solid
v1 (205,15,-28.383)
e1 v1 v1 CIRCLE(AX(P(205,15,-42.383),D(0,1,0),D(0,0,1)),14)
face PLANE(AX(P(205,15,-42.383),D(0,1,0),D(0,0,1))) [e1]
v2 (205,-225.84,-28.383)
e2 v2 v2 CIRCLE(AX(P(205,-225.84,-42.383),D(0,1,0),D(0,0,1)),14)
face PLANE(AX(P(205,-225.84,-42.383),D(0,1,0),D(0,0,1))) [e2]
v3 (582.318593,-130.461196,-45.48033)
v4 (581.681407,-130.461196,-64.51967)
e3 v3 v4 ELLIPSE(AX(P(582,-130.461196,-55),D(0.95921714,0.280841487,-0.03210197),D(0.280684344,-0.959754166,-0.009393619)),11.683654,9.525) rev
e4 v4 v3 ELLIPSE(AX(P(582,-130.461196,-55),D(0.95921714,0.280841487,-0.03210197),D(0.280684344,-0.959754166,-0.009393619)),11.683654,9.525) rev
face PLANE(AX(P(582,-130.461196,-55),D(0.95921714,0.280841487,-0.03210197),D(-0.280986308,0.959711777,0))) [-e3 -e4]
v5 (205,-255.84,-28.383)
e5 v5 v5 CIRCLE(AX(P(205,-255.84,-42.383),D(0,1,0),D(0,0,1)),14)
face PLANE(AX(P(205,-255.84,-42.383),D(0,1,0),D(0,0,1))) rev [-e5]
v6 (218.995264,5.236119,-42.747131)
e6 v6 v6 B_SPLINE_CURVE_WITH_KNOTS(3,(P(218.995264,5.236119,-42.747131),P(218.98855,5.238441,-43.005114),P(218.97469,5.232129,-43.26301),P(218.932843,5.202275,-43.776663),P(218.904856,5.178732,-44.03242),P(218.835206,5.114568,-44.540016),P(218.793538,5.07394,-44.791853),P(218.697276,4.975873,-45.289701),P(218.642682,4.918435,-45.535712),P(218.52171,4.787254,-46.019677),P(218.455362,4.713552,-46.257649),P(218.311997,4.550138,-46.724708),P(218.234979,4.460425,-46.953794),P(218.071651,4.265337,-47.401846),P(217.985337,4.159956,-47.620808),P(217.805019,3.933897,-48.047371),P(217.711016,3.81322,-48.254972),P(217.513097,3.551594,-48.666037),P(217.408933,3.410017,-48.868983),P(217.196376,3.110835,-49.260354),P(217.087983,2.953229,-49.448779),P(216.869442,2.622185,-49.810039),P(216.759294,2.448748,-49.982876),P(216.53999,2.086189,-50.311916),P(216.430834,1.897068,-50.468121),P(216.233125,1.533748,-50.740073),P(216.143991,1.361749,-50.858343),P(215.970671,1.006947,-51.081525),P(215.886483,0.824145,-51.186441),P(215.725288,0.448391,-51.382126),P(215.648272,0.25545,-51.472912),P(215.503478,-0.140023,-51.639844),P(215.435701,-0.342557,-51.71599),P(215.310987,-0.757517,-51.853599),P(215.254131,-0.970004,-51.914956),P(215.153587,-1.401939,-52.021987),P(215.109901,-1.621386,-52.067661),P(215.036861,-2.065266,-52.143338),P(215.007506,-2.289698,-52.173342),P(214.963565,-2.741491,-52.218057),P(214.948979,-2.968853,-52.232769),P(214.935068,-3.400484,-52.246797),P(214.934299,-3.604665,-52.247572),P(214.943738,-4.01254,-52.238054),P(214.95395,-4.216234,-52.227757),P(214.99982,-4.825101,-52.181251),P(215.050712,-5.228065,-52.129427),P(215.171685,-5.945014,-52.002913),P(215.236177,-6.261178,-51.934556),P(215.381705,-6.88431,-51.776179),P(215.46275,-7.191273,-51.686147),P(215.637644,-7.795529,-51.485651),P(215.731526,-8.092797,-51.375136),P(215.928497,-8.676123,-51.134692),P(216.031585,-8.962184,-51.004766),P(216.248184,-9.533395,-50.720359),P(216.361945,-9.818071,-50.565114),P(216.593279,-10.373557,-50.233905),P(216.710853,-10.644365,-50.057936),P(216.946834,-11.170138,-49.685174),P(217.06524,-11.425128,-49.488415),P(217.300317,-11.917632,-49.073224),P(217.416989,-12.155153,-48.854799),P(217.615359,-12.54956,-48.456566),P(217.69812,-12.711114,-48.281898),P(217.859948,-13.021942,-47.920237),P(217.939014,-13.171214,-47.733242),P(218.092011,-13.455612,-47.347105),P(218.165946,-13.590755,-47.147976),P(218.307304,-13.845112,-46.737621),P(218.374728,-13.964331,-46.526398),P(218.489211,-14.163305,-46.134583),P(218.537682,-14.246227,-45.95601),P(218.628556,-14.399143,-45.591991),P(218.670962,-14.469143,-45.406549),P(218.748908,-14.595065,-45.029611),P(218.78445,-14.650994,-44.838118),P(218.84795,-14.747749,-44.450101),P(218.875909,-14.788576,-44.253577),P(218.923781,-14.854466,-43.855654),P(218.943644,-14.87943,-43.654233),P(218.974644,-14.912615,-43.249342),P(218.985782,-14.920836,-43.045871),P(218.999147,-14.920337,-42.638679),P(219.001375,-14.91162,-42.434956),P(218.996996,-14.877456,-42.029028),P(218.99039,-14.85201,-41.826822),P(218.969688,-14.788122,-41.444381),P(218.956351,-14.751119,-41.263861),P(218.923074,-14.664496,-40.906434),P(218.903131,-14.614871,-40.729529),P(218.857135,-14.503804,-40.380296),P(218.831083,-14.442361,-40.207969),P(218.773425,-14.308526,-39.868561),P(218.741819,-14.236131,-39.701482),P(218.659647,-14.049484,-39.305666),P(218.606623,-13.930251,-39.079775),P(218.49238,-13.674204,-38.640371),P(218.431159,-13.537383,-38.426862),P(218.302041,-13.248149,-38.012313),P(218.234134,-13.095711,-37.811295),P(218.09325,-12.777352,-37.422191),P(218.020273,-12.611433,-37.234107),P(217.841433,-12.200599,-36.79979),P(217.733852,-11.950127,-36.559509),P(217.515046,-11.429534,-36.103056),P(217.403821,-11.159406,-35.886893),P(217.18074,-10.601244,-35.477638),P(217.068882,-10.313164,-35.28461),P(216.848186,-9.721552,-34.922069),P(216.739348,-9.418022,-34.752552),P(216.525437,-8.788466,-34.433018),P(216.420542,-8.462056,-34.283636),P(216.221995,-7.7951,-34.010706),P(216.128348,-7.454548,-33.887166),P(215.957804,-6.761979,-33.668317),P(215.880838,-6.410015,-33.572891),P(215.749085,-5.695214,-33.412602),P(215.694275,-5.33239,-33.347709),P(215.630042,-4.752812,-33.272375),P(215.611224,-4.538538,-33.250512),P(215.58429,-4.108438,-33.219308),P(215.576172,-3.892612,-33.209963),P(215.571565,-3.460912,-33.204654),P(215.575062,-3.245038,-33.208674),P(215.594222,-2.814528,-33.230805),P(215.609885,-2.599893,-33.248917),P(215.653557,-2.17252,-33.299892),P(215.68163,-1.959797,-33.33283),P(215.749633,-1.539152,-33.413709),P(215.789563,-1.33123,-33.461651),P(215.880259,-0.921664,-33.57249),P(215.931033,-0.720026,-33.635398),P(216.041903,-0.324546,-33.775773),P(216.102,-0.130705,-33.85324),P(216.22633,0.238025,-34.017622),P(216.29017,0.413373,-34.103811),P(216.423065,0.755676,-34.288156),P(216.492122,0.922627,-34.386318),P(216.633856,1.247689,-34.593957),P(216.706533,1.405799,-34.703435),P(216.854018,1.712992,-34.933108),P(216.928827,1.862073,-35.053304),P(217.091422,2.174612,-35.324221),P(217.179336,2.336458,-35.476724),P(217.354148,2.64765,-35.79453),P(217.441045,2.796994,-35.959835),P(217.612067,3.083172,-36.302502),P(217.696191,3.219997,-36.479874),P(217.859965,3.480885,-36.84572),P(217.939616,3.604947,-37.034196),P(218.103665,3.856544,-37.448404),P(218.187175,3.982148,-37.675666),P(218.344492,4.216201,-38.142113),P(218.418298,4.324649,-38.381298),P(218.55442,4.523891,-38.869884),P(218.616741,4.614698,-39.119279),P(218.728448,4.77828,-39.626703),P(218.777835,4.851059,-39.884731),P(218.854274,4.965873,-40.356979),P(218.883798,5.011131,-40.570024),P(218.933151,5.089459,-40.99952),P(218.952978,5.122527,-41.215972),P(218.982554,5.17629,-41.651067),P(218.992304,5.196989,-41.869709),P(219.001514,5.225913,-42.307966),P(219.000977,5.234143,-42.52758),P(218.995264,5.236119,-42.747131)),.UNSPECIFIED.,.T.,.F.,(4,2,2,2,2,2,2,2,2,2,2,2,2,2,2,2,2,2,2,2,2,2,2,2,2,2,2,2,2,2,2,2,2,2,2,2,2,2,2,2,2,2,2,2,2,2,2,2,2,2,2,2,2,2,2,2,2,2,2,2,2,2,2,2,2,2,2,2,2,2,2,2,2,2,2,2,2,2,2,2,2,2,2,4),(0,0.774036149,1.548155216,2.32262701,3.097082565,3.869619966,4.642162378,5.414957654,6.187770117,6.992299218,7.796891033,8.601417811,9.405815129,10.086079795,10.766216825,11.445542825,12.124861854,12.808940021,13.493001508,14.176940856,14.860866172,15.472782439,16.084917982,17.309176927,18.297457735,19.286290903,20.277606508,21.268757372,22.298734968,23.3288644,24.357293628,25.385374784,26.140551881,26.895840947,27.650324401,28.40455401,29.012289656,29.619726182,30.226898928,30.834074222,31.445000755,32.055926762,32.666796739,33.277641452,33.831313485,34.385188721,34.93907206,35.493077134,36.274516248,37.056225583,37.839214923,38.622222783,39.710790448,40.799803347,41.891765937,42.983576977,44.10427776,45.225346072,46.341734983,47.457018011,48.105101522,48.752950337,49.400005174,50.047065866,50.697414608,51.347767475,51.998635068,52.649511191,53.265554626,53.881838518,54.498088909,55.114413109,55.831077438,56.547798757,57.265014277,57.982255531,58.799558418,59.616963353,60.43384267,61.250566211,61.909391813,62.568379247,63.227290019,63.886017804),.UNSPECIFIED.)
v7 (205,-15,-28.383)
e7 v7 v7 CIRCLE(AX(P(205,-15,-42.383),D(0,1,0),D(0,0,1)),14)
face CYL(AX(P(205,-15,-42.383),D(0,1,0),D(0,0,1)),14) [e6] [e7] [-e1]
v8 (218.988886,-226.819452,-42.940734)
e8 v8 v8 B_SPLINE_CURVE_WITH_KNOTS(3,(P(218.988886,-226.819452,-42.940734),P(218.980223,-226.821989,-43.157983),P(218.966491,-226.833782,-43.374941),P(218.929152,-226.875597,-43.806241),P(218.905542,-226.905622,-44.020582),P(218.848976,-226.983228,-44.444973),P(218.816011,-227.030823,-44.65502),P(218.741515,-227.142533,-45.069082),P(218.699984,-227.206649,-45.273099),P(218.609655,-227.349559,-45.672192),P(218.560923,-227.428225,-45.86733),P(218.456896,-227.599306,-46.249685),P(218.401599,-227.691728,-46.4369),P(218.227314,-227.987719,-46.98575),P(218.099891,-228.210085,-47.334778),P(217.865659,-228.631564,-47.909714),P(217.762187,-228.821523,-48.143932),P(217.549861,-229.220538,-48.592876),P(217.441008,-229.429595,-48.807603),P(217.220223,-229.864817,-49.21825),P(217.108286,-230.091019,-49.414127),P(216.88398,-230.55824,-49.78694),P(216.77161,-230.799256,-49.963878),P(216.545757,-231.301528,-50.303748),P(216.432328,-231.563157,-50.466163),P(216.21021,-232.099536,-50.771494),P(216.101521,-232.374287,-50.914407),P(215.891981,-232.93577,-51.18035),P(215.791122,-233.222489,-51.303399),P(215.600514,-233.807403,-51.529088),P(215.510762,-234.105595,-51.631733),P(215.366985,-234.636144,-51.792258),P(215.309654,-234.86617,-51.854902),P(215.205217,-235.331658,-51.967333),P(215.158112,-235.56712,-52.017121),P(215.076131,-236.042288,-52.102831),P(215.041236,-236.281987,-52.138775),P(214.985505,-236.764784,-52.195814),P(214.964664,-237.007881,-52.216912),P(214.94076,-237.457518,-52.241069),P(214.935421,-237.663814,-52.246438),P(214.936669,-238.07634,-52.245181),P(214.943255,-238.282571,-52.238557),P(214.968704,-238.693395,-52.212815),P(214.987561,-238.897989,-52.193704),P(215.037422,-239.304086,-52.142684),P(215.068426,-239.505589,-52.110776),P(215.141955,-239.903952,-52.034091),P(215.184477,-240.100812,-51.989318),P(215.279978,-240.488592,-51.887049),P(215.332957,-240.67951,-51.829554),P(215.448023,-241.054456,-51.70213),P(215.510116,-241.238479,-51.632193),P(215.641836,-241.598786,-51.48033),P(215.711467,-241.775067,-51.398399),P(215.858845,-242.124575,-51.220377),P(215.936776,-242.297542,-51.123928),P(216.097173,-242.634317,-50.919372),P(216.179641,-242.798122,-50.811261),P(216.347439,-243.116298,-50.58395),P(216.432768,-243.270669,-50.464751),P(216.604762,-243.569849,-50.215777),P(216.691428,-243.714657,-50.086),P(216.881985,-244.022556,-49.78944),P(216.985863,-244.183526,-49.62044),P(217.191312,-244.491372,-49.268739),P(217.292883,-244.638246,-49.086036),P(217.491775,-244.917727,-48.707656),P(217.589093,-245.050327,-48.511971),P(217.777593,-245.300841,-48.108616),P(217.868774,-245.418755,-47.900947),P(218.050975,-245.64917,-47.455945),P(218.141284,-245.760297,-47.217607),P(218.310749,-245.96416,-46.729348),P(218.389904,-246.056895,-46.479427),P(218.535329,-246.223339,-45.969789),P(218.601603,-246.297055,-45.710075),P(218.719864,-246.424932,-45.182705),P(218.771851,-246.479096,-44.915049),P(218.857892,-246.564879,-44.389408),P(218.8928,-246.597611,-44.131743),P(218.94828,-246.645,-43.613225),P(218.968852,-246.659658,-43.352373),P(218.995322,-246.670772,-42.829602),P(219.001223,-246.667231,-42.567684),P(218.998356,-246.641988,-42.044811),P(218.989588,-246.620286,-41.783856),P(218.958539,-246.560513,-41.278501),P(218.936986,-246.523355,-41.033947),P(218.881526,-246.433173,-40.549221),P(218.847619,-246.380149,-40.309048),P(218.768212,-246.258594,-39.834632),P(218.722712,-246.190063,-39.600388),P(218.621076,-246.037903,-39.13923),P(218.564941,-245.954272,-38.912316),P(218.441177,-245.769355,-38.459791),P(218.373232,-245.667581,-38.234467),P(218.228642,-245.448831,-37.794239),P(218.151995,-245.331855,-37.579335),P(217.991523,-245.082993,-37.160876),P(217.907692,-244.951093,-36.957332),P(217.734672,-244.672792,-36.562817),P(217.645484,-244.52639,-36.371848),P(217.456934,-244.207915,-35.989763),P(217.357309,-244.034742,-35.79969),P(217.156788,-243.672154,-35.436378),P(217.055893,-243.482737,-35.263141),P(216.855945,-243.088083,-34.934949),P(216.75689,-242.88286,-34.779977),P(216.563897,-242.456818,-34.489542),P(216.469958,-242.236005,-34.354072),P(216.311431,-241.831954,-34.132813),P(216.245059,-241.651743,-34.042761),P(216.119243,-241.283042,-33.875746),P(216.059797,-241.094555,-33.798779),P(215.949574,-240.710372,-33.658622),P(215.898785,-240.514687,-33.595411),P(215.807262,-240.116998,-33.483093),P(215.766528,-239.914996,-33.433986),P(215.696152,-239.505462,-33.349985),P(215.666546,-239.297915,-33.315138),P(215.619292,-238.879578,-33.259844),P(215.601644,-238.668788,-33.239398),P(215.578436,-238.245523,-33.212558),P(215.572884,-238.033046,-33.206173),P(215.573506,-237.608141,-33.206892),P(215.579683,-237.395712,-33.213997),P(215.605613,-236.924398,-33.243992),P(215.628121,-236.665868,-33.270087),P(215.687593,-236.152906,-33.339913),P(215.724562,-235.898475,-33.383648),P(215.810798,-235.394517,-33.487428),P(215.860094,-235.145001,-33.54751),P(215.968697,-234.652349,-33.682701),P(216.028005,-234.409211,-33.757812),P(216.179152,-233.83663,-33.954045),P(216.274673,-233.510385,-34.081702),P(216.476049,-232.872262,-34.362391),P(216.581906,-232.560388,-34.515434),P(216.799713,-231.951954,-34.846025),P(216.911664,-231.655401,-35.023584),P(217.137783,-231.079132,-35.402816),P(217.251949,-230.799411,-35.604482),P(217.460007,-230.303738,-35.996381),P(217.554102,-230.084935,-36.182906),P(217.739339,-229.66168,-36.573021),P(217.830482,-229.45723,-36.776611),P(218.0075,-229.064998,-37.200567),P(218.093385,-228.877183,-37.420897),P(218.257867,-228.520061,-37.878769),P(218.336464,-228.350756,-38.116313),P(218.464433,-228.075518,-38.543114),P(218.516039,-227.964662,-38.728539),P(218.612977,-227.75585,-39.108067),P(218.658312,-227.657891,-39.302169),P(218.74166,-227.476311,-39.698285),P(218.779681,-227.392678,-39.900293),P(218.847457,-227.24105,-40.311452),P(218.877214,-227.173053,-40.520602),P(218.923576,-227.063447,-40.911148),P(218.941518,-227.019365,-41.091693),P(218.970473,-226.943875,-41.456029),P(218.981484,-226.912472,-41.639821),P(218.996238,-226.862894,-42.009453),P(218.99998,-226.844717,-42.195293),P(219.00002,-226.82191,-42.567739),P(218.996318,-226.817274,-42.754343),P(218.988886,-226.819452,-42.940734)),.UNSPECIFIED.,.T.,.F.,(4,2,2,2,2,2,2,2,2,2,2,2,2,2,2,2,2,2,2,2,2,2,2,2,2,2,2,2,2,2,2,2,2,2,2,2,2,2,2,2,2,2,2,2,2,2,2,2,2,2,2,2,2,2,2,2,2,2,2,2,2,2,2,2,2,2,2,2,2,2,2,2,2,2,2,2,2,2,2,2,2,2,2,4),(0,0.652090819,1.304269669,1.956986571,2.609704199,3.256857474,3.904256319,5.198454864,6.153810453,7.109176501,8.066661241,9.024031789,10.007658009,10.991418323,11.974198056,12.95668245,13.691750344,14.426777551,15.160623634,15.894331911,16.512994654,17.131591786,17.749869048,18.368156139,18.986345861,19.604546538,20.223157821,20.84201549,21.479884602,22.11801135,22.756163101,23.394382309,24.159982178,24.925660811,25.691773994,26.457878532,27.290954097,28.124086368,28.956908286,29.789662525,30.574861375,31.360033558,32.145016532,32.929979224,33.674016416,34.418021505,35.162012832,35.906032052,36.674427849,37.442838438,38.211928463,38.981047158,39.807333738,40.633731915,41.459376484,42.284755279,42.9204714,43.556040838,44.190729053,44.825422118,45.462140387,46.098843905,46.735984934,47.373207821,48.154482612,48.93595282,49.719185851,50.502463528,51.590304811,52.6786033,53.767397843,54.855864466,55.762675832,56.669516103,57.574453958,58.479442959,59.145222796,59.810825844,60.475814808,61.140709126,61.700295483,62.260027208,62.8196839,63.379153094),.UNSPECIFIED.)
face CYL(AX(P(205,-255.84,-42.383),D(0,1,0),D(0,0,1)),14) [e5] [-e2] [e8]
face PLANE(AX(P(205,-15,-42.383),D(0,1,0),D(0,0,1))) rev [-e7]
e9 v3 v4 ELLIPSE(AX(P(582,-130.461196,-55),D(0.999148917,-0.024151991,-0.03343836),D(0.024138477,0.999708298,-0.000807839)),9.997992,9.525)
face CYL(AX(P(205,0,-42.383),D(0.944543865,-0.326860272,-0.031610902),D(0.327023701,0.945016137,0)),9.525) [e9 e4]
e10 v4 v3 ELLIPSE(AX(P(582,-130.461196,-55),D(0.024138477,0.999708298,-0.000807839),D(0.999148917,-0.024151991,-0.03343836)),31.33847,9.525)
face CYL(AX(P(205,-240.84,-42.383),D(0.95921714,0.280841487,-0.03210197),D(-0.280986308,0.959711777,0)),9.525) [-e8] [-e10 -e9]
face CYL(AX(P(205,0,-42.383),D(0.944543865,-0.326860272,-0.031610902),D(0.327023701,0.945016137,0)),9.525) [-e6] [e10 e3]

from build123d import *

# Parameters (mm, degrees)
SUSP_FR_LCA_FRONT_LEG_PROFILE_R  = 9.525
SUSP_FR_LCA_REAR_LEG_START       = 194.971257269
SUSP_FR_LCA_REAR_LEG_OUTLINE_R   = 9.525
SUSP_FR_LCA_REAR_LEG_DEPTH       = 392.368202981
SUSP_FR_LCA_REAR_LEG_START_2     = 587.33946025
SUSP_FR_LCA_REAR_LEG_2_OUTLINE_R = 9.525
SUSP_FR_LCA_REAR_LEG_2_DEPTH     = 13.53250199
SUSP_FR_LCA_REAR_LEG_START_3     = 523.39106775
SUSP_FR_LCA_REAR_LEG_3_OUTLINE_W = 26
SUSP_FR_LCA_REAR_LEG_3_OUTLINE_H = 23
SUSP_FR_LCA_REAR_LEG_3_DEPTH     = 11.60893225
SUSP_FR_LCA_BUSH_FRONT_PROFILE_R = 14
SUSP_FR_LCA_BUSH_REAR_PROFILE_R  = 14


with BuildPart() as part:
    # SUSP_FR_LCA_front_leg: sweep along a curve in space
    with BuildLine() as susp_fr_lca_front_leg_path:
        Line((205, -240.84, -42.383), (582, -130.461196, -55))
    # SUSP_FR_LCA_front_leg profile (on start of the path) → SUSP_FR_LCA_front_leg (sweep)
    with BuildSketch(Plane(origin=(205, -240.84, -42.383), x_dir=(-0.2809863080066093, 0.9597117768959672, 0), z_dir=(0.9592171404331008, 0.28084148736685866, -0.03210196992266429))):
        Circle(SUSP_FR_LCA_FRONT_LEG_PROFILE_R)
    sweep(path=susp_fr_lca_front_leg_path.line)

    # SUSP_FR_LCA_rear_leg: read off the stored shape, not the designer's step
    # SUSP_FR_LCA_rear_leg outline → SUSP_FR_LCA_rear_leg (add)
    with BuildSketch(Plane(origin=(0, 0, 0), x_dir=(0.3266773785489796, 0.9450726759891053, -0.01093286070332221), z_dir=(0.9445438654680327, -0.3268602715210149, -0.031610901725756396)).offset(SUSP_FR_LCA_REAR_LEG_START)):
        with Locations((67.432230038, -35.502420765)):
            Circle(SUSP_FR_LCA_REAR_LEG_OUTLINE_R)
    extrude(amount=SUSP_FR_LCA_REAR_LEG_DEPTH)

    # SUSP_FR_LCA_rear_leg 2 outline → SUSP_FR_LCA_rear_leg 2 (add)
    with BuildSketch(Plane(origin=(0, 0, 0), x_dir=(0.3266773785489796, 0.9450726759891053, -0.01093286070332221), z_dir=(0.9445438654680327, -0.3268602715210149, -0.031610901725756396)).offset(SUSP_FR_LCA_REAR_LEG_START_2)):
        with Locations((67.432230038, -35.502420765)):
            Circle(SUSP_FR_LCA_REAR_LEG_2_OUTLINE_R)
    extrude(amount=SUSP_FR_LCA_REAR_LEG_2_DEPTH)

    # SUSP_FR_LCA_rear_leg 3 outline → SUSP_FR_LCA_rear_leg 3 (cut)
    with BuildSketch(Plane(origin=(0, 0, 0), x_dir=(-0.28068434396715386, 0.959754165905817, 0.009393619012821172), z_dir=(0.9592171404331008, 0.2808414873668589, -0.03210196992266429)).offset(SUSP_FR_LCA_REAR_LEG_START_3)):
        with Locations((-289, -35.5)):
            Rectangle(SUSP_FR_LCA_REAR_LEG_3_OUTLINE_W, SUSP_FR_LCA_REAR_LEG_3_OUTLINE_H)
    extrude(amount=SUSP_FR_LCA_REAR_LEG_3_DEPTH, mode=Mode.SUBTRACT)

    # SUSP_FR_LCA_bush_front: sweep along a curve in space
    with BuildLine() as susp_fr_lca_bush_front_path:
        Line((205, -255.84, -42.383), (205, -225.84, -42.383))
    # SUSP_FR_LCA_bush_front profile (on start of the path) → SUSP_FR_LCA_bush_front (sweep)
    with BuildSketch(Plane(origin=(205, -255.84, -42.383), x_dir=(0, 0, 1), z_dir=(0, 1, 0))):
        Circle(SUSP_FR_LCA_BUSH_FRONT_PROFILE_R)
    sweep(path=susp_fr_lca_bush_front_path.line)

    # SUSP_FR_LCA_bush_rear: sweep along a curve in space
    with BuildLine() as susp_fr_lca_bush_rear_path:
        Line((205, -15, -42.383), (205, 15, -42.383))
    # SUSP_FR_LCA_bush_rear profile (on start of the path) → SUSP_FR_LCA_bush_rear (sweep)
    with BuildSketch(Plane(origin=(205, -15, -42.383), x_dir=(0, 0, 1), z_dir=(0, 1, 0))):
        Circle(SUSP_FR_LCA_BUSH_REAR_PROFILE_R)
    sweep(path=susp_fr_lca_bush_rear_path.line)


solid = part.part
